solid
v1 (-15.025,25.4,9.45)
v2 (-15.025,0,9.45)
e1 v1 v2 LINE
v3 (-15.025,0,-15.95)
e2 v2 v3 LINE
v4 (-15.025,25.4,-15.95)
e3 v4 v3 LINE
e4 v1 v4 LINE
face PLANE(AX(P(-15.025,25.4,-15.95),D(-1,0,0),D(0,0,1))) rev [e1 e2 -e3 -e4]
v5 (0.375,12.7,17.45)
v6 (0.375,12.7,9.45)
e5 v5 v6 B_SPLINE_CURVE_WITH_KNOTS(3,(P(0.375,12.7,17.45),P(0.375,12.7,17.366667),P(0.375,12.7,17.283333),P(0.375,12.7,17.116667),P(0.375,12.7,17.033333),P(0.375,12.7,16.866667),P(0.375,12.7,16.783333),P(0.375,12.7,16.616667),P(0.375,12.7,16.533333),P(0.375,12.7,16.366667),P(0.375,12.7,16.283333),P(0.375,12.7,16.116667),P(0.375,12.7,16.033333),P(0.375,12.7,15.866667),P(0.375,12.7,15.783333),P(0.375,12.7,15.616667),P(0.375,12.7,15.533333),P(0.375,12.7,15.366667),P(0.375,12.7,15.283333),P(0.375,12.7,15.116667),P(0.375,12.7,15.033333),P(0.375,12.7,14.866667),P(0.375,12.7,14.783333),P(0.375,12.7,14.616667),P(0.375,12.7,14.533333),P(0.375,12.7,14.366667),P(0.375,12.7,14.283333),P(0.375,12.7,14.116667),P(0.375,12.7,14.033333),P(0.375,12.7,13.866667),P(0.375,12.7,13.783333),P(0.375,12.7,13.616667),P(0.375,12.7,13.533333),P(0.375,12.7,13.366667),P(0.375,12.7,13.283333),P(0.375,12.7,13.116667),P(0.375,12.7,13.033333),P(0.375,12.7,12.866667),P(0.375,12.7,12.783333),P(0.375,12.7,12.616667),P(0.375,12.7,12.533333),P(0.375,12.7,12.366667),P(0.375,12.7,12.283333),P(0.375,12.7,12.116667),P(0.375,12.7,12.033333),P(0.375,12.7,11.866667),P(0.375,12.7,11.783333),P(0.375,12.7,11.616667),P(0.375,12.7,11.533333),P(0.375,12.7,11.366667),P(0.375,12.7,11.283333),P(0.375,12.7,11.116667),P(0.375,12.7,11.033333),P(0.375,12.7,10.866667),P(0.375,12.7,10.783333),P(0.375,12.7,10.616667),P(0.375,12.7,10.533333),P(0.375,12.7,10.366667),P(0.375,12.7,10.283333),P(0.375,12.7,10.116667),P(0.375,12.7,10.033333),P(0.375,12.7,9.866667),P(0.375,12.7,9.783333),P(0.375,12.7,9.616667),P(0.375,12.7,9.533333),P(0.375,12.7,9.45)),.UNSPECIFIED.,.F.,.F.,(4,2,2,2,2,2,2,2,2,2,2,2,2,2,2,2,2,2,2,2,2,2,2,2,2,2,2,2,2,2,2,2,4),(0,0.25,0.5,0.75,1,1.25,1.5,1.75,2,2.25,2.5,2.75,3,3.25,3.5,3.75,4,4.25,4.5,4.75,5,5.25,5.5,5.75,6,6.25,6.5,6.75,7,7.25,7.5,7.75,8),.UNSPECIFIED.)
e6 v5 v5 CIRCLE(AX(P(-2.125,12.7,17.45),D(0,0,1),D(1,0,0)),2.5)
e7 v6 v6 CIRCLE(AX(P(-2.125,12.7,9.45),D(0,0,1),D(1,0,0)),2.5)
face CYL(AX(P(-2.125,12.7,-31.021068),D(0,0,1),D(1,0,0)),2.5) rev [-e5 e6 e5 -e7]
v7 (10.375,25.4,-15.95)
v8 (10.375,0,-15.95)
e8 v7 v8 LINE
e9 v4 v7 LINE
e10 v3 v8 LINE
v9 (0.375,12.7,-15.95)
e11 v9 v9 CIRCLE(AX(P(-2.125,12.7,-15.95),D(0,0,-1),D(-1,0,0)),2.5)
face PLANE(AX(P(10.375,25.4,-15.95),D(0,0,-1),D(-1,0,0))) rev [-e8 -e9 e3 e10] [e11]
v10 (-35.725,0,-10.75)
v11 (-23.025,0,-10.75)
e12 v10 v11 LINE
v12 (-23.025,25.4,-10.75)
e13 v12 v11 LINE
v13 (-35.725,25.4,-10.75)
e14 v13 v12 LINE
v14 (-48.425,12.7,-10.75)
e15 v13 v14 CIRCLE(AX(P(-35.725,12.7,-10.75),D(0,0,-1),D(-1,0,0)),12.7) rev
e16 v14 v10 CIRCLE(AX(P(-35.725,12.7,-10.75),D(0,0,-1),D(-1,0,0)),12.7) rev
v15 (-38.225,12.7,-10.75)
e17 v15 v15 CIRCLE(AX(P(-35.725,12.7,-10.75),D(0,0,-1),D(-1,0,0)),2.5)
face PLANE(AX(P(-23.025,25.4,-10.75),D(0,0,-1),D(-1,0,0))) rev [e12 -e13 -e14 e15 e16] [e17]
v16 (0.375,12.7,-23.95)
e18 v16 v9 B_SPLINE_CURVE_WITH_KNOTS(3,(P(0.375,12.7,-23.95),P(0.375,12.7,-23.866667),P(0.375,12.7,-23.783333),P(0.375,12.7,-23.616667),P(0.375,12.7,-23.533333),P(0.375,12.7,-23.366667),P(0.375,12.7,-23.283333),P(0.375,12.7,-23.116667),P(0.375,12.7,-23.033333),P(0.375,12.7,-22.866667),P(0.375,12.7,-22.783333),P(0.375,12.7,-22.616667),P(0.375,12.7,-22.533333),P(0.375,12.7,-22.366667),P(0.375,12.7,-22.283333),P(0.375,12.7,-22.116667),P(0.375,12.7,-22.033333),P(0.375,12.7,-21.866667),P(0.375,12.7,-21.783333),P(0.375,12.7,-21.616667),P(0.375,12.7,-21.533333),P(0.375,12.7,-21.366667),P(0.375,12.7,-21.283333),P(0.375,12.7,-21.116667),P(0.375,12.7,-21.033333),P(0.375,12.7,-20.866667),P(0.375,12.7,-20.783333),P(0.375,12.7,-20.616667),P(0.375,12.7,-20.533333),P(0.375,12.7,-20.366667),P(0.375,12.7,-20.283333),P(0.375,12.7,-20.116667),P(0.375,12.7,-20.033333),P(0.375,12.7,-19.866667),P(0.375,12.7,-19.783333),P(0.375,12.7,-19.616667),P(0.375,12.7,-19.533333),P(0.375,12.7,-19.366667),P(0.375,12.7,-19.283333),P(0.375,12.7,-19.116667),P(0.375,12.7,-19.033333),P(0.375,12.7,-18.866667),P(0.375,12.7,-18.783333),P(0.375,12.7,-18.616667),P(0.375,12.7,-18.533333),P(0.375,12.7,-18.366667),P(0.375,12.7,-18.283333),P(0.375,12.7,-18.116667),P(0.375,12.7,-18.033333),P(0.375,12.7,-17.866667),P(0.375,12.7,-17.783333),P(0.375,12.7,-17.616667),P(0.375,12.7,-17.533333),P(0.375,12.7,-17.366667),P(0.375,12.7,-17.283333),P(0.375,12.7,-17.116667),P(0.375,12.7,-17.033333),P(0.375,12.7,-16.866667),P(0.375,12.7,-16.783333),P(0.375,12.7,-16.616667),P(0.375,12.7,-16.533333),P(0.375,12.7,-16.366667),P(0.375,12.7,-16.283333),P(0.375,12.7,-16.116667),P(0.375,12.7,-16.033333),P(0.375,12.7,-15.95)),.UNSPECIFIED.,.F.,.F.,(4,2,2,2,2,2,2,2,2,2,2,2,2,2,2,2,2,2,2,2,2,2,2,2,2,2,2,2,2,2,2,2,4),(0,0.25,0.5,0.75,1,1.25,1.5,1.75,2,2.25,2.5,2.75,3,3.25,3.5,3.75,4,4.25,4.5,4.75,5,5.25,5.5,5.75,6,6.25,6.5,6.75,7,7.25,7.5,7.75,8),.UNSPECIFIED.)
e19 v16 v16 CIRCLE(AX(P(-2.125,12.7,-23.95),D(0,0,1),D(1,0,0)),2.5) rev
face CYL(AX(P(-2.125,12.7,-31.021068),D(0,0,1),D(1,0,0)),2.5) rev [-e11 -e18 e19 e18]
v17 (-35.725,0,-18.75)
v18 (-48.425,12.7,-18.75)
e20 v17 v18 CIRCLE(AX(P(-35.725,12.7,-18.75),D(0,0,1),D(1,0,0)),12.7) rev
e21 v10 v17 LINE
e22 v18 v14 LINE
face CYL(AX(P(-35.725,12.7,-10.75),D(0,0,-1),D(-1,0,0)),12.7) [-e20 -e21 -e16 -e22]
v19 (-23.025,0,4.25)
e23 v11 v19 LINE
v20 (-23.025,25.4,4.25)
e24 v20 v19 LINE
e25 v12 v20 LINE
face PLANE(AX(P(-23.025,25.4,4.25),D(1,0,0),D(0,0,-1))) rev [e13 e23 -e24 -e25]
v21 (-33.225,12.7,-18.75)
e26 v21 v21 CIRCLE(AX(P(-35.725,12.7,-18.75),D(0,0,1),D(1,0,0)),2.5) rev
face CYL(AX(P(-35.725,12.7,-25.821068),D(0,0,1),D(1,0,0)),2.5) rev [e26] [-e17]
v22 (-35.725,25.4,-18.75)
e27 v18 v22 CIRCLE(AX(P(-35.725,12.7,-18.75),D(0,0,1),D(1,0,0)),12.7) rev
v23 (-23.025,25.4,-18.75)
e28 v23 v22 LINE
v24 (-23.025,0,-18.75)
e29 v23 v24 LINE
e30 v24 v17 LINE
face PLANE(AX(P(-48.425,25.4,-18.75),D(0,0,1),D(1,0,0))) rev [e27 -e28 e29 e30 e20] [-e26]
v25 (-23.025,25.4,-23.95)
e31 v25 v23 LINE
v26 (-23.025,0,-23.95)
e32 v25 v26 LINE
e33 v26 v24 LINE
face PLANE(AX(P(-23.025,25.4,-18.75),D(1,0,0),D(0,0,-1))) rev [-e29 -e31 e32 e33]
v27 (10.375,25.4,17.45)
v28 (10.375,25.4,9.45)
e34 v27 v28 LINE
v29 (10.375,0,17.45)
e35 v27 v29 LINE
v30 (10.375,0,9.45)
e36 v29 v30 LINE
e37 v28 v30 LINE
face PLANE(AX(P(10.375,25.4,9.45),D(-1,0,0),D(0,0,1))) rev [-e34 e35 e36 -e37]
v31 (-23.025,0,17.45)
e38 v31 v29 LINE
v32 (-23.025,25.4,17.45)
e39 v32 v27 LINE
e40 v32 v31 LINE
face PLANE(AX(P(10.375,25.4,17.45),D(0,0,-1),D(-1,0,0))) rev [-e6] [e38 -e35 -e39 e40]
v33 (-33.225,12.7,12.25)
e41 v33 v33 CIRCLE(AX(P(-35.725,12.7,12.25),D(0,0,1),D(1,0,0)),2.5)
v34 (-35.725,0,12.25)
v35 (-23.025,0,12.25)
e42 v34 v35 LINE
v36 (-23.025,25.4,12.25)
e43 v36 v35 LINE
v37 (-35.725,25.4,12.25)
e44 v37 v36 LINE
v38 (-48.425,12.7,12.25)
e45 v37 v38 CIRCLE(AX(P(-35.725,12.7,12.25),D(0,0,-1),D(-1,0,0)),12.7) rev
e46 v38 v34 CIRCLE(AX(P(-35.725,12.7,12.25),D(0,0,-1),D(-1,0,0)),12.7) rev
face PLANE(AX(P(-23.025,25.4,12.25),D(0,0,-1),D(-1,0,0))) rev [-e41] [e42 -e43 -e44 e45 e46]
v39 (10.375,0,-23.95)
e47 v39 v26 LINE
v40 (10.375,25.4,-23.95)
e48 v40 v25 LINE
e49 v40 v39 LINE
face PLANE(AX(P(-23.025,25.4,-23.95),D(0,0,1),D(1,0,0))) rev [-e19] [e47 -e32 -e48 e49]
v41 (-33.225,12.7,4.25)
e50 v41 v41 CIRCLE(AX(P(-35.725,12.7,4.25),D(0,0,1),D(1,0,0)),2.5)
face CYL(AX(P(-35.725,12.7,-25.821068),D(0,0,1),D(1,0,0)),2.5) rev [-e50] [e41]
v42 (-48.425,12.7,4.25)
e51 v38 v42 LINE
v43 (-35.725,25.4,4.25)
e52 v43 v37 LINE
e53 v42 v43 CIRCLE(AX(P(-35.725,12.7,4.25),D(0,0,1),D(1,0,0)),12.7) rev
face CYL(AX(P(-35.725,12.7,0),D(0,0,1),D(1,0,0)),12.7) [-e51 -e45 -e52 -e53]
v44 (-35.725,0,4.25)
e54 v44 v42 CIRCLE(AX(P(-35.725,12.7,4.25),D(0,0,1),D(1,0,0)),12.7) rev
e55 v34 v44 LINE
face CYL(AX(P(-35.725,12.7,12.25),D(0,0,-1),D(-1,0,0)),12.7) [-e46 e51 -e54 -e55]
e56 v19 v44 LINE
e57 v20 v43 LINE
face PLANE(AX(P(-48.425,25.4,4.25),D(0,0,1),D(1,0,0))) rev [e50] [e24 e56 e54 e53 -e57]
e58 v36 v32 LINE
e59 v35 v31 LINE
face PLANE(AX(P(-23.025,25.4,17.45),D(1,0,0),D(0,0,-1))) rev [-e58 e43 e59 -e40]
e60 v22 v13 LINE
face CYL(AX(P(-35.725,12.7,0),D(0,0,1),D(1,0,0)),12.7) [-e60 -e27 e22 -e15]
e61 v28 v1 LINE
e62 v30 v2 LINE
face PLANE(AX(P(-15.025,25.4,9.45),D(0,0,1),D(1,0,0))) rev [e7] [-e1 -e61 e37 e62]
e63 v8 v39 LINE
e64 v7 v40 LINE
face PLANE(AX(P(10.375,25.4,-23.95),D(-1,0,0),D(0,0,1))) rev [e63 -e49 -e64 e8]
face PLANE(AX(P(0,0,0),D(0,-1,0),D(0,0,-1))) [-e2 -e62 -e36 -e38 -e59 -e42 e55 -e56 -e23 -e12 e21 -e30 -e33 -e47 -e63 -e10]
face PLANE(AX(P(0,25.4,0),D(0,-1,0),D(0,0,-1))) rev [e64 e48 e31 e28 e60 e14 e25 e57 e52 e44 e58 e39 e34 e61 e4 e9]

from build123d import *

# Parameters (mm, degrees)
BOSS_EXTRUDE1_DEPTH = 25.4
FILLET1_R           = 12.7
CUT_EXTRUDE1_REACH  = 67.579
SKETCH2_R           = 2.5
CUT_EXTRUDE2_REACH  = 70.586
SKETCH3_R           = 2.5


with BuildPart() as part:
    # Sketch1 → Boss-Extrude1 (new body)
    with BuildSketch(Plane(origin=(0, 0, 0), x_dir=(1, 0, 0), z_dir=(0, 1, 0))):
        Polygon((10.375, 15.95), (-15.025, 15.95), (-15.025, -9.45), (10.375, -9.45), (10.375, -17.45), (-23.025, -17.45), (-23.025, -12.25), (-48.425, -12.25), (-48.425, -4.25), (-23.025, -4.25), (-23.025, 10.75), (-48.425, 10.75), (-48.425, 18.75), (-23.025, 18.75), (-23.025, 23.95), (10.375, 23.95), align=None)
    extrude(amount=BOSS_EXTRUDE1_DEPTH)

    # Fillet1
    fillet1_edges = [part.edges().sort_by_distance(p)[0] for p in [
        (-48.425, 25.4, -14.75),
        (-48.425, 0, -14.75),
        (-48.425, 0, 8.25),
        (-48.425, 25.4, 8.25),
    ]]
    fillet(fillet1_edges, radius=FILLET1_R - 0.0001)  # a hair under: the kernel refuses the full size

    # Cut-Extrude1: up to this face of the body (flat: up to its plane)
    cut_extrude1_end = Plane(part.part.faces().sort_by_distance((-34.539475021, 12.7, -18.75))[0])
    # Sketch2 → Cut-Extrude1 (cut, up to the picked face)
    with BuildSketch(Plane.XY.offset(12.25), mode=Mode.PRIVATE) as cut_extrude1_sk1:
        with Locations((-35.725, 12.7)):
            Circle(SKETCH2_R)
    cut_extrude1_tool1 = split(extrude(cut_extrude1_sk1.sketch, amount=-CUT_EXTRUDE1_REACH, mode=Mode.PRIVATE), bisect_by=cut_extrude1_end, keep=Keep.BOTH, mode=Mode.PRIVATE)
    add(cut_extrude1_tool1.solids().sort_by(Axis((-35.725, 12.7, 12.25), (0, 0, -1)))[0], mode=Mode.SUBTRACT)

    # Cut-Extrude2: up to this face of the body (flat: up to its plane)
    cut_extrude2_end = Plane(part.part.faces().sort_by_distance((-6.325, 12.7, -23.95))[0])
    # Sketch3 → Cut-Extrude2 (cut, up to the picked face)
    with BuildSketch(Plane.XY.offset(17.45), mode=Mode.PRIVATE) as cut_extrude2_sk1:
        with Locations((-2.125, 12.7)):
            Circle(SKETCH3_R)
    cut_extrude2_tool1 = split(extrude(cut_extrude2_sk1.sketch, amount=-CUT_EXTRUDE2_REACH, mode=Mode.PRIVATE), bisect_by=cut_extrude2_end, keep=Keep.BOTH, mode=Mode.PRIVATE)
    add(cut_extrude2_tool1.solids().sort_by(Axis((-2.125, 12.7, 17.45), (0, 0, -1)))[0], mode=Mode.SUBTRACT)


solid = part.part
